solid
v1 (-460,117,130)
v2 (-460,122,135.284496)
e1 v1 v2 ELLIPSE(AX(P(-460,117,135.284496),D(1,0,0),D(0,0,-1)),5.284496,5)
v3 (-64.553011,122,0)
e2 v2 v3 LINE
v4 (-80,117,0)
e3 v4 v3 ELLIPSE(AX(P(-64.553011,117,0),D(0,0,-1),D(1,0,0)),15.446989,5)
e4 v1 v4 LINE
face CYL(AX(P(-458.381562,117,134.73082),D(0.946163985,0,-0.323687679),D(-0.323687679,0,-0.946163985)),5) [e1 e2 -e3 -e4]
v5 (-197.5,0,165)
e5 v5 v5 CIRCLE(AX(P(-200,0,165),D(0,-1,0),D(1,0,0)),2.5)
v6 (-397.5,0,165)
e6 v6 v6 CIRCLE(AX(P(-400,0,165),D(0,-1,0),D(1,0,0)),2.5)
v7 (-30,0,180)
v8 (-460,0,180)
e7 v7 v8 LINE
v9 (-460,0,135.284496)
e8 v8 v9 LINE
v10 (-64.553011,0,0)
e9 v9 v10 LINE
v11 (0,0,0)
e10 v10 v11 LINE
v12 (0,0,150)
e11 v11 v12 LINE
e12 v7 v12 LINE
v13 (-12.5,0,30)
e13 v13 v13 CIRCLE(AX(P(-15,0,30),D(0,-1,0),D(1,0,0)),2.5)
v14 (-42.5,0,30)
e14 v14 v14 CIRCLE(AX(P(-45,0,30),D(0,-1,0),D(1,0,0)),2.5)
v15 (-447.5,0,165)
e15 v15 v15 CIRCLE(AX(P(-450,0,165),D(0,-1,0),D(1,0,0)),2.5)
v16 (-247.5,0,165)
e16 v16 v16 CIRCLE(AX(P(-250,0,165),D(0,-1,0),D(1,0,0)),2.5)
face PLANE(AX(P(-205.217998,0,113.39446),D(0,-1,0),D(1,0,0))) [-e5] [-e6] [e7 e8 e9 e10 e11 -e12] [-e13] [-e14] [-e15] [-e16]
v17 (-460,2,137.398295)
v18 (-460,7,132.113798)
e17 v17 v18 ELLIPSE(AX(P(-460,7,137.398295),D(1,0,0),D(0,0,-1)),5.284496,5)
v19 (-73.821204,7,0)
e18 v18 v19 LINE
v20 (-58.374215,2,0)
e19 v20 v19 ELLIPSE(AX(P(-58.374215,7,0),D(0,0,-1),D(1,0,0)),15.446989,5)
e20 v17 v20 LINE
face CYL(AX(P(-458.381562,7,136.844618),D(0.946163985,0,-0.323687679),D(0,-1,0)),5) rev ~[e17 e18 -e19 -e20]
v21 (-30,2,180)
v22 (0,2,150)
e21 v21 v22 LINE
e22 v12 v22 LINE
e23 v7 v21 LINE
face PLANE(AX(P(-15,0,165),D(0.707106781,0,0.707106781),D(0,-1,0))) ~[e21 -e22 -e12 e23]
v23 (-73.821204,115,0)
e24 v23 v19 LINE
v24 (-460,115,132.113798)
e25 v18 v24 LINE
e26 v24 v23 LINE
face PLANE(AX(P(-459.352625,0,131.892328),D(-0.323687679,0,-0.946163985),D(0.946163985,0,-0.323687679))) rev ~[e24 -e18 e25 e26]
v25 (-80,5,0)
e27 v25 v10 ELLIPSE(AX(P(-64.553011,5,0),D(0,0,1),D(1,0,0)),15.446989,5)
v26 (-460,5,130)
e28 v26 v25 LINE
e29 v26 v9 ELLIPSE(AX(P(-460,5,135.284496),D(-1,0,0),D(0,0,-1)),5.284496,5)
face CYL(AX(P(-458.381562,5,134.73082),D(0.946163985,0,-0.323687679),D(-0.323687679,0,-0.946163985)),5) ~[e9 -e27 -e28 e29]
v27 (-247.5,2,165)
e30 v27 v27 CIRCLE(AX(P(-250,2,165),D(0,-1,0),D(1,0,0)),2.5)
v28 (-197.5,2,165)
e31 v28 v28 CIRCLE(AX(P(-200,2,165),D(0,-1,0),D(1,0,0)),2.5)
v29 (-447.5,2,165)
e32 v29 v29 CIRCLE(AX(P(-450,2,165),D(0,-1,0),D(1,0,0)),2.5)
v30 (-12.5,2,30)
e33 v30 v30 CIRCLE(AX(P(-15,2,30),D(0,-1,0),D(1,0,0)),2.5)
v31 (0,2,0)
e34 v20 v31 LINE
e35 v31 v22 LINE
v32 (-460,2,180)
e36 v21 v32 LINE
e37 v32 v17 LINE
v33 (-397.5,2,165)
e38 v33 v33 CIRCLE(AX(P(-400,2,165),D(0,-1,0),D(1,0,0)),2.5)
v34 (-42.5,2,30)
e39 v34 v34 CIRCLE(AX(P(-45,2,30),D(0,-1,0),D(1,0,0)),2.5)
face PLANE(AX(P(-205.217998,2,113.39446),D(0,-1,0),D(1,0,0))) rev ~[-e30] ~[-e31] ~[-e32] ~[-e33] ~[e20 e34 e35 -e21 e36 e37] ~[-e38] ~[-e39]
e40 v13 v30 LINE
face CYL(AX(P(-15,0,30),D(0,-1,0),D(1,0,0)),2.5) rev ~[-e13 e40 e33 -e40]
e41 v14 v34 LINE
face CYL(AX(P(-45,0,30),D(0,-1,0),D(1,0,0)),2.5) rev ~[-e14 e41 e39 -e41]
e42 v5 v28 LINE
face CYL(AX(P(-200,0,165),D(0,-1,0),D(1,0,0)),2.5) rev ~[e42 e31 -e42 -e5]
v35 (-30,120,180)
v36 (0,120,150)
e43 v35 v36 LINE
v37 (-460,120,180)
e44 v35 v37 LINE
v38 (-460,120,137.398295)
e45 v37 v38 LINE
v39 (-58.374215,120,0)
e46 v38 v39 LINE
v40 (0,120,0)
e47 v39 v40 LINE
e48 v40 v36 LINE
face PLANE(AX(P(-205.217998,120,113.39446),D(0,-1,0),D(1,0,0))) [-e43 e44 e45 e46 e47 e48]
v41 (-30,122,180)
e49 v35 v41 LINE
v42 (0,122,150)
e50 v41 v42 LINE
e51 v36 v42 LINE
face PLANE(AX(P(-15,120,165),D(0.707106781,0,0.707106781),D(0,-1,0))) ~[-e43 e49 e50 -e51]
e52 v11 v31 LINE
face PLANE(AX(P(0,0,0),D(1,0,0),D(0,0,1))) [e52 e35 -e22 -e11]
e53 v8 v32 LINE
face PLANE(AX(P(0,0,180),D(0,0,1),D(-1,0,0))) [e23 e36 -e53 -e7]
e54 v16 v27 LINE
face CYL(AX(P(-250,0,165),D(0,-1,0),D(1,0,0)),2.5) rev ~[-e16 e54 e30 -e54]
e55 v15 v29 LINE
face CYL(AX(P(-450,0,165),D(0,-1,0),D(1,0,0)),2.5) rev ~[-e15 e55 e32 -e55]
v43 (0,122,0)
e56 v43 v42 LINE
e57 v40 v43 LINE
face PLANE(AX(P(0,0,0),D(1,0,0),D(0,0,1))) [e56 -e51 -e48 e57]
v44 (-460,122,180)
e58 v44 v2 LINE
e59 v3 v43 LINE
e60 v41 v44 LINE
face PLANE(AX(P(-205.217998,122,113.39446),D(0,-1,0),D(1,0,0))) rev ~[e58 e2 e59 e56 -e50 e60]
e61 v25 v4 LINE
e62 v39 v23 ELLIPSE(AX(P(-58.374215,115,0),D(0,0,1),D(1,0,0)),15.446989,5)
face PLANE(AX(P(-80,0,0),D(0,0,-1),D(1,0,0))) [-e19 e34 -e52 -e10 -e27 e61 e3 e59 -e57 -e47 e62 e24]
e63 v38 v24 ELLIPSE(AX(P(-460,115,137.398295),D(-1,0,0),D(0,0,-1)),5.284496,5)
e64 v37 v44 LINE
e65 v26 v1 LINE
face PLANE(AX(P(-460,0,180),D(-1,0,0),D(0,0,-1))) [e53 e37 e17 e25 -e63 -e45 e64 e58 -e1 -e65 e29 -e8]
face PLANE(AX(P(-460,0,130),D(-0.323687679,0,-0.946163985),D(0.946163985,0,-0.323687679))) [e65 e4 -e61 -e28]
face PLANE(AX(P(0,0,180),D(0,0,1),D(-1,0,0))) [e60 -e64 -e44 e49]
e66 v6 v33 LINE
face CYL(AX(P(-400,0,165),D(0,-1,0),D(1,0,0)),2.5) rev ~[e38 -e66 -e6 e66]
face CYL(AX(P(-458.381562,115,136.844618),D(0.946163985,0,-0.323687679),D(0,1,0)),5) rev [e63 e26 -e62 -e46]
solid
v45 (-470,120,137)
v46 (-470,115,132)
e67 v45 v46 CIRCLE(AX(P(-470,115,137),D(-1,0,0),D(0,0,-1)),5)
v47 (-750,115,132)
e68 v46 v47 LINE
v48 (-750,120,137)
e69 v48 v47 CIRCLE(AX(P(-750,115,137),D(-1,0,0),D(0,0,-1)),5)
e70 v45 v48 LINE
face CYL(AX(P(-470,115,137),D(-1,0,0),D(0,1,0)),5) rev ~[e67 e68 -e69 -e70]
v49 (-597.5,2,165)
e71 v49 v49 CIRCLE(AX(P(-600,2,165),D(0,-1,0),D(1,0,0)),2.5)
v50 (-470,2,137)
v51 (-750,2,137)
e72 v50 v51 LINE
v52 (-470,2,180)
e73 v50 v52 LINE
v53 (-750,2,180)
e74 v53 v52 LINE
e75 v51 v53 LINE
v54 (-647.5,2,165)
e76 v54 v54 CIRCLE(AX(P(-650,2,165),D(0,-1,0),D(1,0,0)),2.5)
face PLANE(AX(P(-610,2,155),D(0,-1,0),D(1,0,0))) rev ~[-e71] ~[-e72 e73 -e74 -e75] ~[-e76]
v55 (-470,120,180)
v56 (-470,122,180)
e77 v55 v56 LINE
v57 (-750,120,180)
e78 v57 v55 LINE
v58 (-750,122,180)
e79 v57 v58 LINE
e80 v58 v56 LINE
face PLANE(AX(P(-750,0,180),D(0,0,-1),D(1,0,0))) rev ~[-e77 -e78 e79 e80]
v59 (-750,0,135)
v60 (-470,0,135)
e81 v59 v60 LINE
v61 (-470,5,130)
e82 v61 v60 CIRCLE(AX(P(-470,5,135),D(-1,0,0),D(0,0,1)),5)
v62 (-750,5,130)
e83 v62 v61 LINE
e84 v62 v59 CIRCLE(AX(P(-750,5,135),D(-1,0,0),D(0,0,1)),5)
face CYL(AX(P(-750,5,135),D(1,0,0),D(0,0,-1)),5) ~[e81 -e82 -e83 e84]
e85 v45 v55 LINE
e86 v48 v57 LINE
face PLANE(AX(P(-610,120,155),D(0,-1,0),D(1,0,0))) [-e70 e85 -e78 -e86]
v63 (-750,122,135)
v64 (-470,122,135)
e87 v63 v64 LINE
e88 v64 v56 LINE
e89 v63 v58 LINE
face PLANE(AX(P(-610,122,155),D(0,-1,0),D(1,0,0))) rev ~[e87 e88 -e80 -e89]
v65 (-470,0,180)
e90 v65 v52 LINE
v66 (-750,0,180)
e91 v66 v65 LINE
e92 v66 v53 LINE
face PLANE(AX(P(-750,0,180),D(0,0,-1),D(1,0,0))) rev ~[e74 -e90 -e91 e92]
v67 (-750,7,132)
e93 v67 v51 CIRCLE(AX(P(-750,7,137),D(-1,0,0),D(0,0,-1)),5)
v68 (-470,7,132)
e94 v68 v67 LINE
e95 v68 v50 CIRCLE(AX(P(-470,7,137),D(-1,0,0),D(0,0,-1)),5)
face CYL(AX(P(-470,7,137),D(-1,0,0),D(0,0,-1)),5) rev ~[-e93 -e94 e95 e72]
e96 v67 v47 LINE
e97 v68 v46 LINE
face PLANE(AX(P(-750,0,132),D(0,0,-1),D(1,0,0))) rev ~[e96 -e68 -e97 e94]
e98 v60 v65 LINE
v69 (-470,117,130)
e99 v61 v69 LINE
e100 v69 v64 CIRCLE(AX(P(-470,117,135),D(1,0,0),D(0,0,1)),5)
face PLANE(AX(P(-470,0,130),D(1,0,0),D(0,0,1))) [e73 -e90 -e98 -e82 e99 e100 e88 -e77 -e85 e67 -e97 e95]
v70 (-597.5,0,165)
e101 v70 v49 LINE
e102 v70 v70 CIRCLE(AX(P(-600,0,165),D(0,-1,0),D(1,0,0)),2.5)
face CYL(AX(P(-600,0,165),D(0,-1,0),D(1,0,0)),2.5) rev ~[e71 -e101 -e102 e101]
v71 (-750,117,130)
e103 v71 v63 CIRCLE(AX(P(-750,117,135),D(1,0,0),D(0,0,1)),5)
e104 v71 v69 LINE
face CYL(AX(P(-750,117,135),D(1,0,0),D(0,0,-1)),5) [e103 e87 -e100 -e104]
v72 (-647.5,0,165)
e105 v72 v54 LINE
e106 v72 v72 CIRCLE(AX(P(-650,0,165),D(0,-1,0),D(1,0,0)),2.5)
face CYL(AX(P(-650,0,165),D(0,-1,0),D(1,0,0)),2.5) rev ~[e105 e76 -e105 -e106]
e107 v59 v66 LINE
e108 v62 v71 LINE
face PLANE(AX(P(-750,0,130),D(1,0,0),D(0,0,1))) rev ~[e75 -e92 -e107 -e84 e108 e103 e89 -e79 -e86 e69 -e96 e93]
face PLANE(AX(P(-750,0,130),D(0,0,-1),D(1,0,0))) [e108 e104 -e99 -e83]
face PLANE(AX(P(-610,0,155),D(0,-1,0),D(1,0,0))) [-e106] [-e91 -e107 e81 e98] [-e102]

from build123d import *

# Parameters (mm, degrees)
F1_DEPTH = 122
F2_T     = -2
F3_R     = 5
F4_SIZE  = 30
F5_W     = 280
F5_H     = 50
F6_DEPTH = 122
F7_T     = -2
F8_R     = 2.5
F9_DEPTH = 25
F10_R    = 5


with BuildPart() as f1:
    # F0 (on Front) → F1 (new body)
    with BuildSketch(Plane.XZ):
        Polygon((-80, 0), (0, 0), (0, 180), (-460, 180), (-460, 130), align=None)
    extrude(amount=-F1_DEPTH)

    # F2
    f2_openings = [f1.faces().sort_by_distance(p)[0] for p in [
        (-230, 61, 180),
        (0, 61, 90),
        (-40, 61, 0),
        (-460, 61, 155),
    ]]
    offset(amount=F2_T, openings=f2_openings)

    # F3
    f3_edges = [f1.edges().sort_by_distance(p)[0] for p in [
        (-270, 0, 65),
        (-270, 122, 65),
        (-266.910602, 2, 66.056899),
        (-266.910602, 120, 66.056899),
    ]]
    fillet(f3_edges, radius=F3_R)

    # F4
    f4_edges = [f1.edges().sort_by_distance(p)[0] for p in [
        (0, 1, 180),
        (0, 121, 180),
    ]]
    chamfer(f4_edges, length=F4_SIZE)


with BuildPart() as f6:
    # F5 (on Front) → F6 (new body)
    with BuildSketch(Plane.XZ):
        with Locations((-610, 155)):
            Rectangle(F5_W, F5_H)
    extrude(amount=-F6_DEPTH)

    # F7
    f7_openings = [f6.faces().sort_by_distance(p)[0] for p in [
        (-610, 61, 180),
        (-470, 61, 155),
        (-750, 61, 155),
    ]]
    offset(amount=F7_T, openings=f7_openings)


with BuildPart() as f9_tool:
    # F8 (on face) → F9 (new body)
    with BuildSketch(Plane.XZ):
        with Locations((-45, 30)):
            Circle(F8_R)
        with Locations((-15, 30)):
            Circle(F8_R)
        with Locations((-450, 165)):
            Circle(F8_R)
        with Locations((-400, 165)):
            Circle(F8_R)
        with Locations((-250, 165)):
            Circle(F8_R)
        with Locations((-200, 165)):
            Circle(F8_R)
        with Locations((-650, 165)):
            Circle(F8_R)
        with Locations((-600, 165)):
            Circle(F8_R)
    extrude(amount=-F9_DEPTH)


with BuildPart() as f1_1:
    add(f1.part)

    # F9: cut by f9_tool
    add(f9_tool.part, mode=Mode.SUBTRACT)


with BuildPart() as f6_1:
    add(f6.part)

    # F9: cut by f9_tool
    add(f9_tool.part, mode=Mode.SUBTRACT)

    # F10
    f10_edges = [f6_1.edges().sort_by_distance(p)[0] for p in [
        (-610, 0, 130),
        (-610, 122, 130),
        (-610, 120, 132),
        (-610, 2, 132),
    ]]
    fillet(f10_edges, radius=F10_R)


solid = Compound([f1_1.part, f6_1.part])
